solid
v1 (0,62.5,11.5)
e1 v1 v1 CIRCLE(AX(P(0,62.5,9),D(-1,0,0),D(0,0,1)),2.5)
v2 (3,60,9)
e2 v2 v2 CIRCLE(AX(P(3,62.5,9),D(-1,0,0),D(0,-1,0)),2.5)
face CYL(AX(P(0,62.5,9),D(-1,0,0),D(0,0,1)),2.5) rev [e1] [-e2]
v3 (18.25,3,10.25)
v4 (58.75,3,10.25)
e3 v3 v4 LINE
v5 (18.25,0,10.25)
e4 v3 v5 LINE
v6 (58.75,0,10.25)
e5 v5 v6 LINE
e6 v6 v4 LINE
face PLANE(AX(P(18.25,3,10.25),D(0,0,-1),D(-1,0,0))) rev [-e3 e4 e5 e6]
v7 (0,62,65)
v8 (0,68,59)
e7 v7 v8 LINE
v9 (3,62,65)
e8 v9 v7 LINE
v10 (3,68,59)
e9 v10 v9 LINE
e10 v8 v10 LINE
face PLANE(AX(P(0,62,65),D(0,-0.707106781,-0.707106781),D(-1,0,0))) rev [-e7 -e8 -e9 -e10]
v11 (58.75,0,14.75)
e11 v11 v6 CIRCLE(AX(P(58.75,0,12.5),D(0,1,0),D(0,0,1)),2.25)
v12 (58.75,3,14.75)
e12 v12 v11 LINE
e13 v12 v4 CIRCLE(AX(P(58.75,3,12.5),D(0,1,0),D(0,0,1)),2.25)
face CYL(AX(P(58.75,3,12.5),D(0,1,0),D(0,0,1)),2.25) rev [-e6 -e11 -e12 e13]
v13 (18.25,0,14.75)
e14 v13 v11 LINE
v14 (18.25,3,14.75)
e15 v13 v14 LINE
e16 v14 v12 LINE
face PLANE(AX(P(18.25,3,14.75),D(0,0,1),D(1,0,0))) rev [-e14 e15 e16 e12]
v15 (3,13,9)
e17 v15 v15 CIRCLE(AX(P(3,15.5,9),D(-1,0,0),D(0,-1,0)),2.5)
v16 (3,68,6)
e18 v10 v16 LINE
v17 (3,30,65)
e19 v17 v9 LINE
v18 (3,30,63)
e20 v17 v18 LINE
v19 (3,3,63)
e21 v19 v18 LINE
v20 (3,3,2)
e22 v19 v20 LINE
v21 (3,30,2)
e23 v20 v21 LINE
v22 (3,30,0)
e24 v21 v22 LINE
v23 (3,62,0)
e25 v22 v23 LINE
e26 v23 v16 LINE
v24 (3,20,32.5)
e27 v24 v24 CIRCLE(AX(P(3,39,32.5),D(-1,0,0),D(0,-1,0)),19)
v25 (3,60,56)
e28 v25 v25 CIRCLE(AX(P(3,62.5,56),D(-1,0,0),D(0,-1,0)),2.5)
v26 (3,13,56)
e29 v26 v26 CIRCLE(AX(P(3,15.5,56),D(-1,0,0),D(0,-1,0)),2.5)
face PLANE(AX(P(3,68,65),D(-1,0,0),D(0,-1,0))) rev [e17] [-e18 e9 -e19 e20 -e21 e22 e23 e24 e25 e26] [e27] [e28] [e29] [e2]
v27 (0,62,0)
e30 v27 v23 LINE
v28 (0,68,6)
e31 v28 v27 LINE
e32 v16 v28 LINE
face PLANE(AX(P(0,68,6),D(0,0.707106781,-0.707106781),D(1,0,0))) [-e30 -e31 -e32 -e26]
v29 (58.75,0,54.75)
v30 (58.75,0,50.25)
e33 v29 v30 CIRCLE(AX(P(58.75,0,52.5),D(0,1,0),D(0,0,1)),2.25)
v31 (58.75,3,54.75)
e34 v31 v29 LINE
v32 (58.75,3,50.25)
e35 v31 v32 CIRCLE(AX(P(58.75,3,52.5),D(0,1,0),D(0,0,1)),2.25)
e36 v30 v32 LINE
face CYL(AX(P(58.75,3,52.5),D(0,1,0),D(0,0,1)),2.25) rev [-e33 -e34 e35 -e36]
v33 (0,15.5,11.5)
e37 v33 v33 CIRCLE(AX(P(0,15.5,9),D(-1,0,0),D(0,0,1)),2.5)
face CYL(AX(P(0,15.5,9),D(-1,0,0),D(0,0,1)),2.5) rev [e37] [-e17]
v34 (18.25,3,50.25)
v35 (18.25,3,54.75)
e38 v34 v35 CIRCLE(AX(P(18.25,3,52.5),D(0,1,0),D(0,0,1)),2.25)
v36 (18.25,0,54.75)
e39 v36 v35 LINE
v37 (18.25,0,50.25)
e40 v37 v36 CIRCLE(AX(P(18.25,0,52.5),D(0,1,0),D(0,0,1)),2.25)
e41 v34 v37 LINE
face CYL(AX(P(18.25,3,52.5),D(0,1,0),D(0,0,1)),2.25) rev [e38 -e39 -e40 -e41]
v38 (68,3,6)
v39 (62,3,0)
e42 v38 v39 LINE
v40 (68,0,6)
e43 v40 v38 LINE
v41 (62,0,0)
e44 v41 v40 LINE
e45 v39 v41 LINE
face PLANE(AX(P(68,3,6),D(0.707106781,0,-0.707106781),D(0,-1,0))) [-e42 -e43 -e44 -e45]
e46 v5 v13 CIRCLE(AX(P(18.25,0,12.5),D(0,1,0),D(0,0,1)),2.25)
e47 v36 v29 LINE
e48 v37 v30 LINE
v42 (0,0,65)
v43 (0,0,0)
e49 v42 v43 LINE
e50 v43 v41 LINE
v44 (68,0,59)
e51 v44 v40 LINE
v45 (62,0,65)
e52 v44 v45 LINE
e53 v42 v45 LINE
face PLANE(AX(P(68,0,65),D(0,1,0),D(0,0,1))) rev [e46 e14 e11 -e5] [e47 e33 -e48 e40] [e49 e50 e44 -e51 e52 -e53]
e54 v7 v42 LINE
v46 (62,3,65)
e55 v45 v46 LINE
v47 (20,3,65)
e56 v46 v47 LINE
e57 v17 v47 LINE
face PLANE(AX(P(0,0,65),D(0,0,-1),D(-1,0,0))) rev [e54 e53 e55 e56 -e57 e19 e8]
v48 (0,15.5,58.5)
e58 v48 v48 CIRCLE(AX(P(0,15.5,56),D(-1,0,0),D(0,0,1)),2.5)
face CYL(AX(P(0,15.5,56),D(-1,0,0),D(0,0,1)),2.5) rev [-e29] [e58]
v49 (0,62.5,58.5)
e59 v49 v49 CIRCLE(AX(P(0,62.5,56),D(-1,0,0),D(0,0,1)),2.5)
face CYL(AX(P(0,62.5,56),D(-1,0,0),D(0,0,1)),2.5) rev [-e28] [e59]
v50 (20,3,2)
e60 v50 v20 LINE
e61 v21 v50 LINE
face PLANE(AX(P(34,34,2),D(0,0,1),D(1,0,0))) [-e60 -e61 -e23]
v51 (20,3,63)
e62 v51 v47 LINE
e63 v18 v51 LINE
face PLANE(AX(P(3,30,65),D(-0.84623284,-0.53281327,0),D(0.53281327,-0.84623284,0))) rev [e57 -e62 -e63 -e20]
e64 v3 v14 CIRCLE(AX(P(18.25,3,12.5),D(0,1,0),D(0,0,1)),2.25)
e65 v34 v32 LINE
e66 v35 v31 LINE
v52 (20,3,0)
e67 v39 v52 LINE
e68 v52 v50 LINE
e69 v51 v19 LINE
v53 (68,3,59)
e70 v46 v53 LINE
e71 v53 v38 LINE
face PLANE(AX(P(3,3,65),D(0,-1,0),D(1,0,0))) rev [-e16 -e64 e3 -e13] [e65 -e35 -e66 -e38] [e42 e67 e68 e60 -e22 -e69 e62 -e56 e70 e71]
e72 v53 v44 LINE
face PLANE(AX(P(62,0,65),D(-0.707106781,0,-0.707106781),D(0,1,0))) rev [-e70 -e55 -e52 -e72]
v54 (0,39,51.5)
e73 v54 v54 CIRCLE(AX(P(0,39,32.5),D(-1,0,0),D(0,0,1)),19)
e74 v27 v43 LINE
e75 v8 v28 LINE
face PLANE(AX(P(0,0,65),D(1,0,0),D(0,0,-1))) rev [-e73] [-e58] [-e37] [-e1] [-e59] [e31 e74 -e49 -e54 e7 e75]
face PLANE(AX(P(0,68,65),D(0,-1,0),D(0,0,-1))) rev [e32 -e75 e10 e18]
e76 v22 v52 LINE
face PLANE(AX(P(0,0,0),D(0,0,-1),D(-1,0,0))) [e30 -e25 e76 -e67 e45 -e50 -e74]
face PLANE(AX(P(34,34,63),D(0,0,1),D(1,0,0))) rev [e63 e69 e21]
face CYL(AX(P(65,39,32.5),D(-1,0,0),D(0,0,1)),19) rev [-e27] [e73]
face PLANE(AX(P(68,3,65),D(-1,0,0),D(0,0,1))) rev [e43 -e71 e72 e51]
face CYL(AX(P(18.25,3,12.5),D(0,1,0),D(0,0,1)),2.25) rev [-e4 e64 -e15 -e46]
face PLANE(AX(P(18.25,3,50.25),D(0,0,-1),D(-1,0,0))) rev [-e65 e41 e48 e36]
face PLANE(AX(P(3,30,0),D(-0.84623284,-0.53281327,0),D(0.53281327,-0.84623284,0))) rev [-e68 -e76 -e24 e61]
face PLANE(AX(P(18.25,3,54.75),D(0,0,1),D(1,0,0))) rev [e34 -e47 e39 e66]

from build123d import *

# Parameters (mm, degrees)
EXTRUDE_1_DEPTH             = 65
HOLE_WIZARD_4_5_4_5_1_DEPTH = 3
SKETCH_4_R                  = 19
CUT_EXTRUDE_1_DEPTH         = 65
HOLE_WIZARD_5_0_5_1_D       = 5
CHAMFER_1_SIZE              = 6
RIB_18_REACH                = 118.073
SKETCH_9_WALL_W             = 266.052617732
SKETCH_9_WALL_H             = 2
RIB_19_REACH                = 118.073
SKETCH_8_WALL_W             = 266.052617732
SKETCH_8_WALL_H             = 2


# Read off the part's stored shape, not the designer's step: Ø4.5 (4.5) 直径槽口1
with BuildPart() as part:
    # 草图1 → 凸台-拉伸1 (new body)
    with BuildSketch(Plane.XY):
        Polygon((0, 0), (0, 68), (3, 68), (3, 3), (68, 3), (68, 0), align=None)
    extrude(amount=EXTRUDE_1_DEPTH)

    # Ø4.5 (4.5) 直径槽口1 outline → Ø4.5 (4.5) 直径槽口1 (cut)
    with BuildSketch(Plane(origin=(0, 0, 0), x_dir=(1, 0, 0), z_dir=(0, 1, 0))):
        with BuildLine():
            Line((18.25, -14.75), (58.75, -14.75))
            ThreePointArc((58.75, -14.75), (61, -12.5), (58.75, -10.25))
            Line((58.75, -10.25), (18.25, -10.25))
            ThreePointArc((18.25, -10.25), (16, -12.5), (18.25, -14.75))
        make_face()
        with BuildLine():
            Line((18.25, -54.75), (58.75, -54.75))
            ThreePointArc((58.75, -54.75), (61, -52.5), (58.75, -50.25))
            Line((58.75, -50.25), (18.25, -50.25))
            ThreePointArc((18.25, -50.25), (16, -52.5), (18.25, -54.75))
        make_face()
    extrude(amount=HOLE_WIZARD_4_5_4_5_1_DEPTH, mode=Mode.SUBTRACT)

    # 草图4 → 切除-拉伸1 (cut)
    with BuildSketch(Plane.ZY):
        with Locations((32.5, 39)):
            Circle(SKETCH_4_R)
    extrude(amount=-CUT_EXTRUDE_1_DEPTH, mode=Mode.SUBTRACT)

    # Ø5.0 (5) 直径孔1 (through all)
    with Locations(Plane.ZY):
        with Locations((9, 62.5), (56, 62.5), (9, 15.5), (56, 15.5)):
            Hole(HOLE_WIZARD_5_0_5_1_D / 2)

    # 倒角1
    chamfer_1_edges = [part.edges().sort_by_distance(p)[0] for p in [
        (1.5, 68, 65),
        (1.5, 68, 0),
        (68, 1.5, 65),
        (68, 1.5, 0),
    ]]
    chamfer(chamfer_1_edges, length=CHAMFER_1_SIZE)

    # 草图9 wall → 筋18 (add, up to next)
    with BuildSketch(Plane(origin=(11.5, 16.5, 0), x_dir=(0.532813269686, -0.84623284009, 0), z_dir=(0.84623284009, 0.532813269686, 0)), mode=Mode.PRIVATE) as rib_18_sk1:
        with Locations((0, -1)):
            Rectangle(SKETCH_9_WALL_W, SKETCH_9_WALL_H)
    rib_18_tool1 = extrude(rib_18_sk1.sketch, amount=-RIB_18_REACH, mode=Mode.PRIVATE) - part.part
    add(rib_18_tool1.solids().sort_by_distance((11.5, 16.5, 0))[0])

    # 草图8 wall → 筋19 (add, up to next)
    with BuildSketch(Plane(origin=(11.5, 16.5, 65), x_dir=(0.532813269686, -0.84623284009, 0), z_dir=(0.84623284009, 0.532813269686, 0)), mode=Mode.PRIVATE) as rib_19_sk1:
        with Locations((0, 1)):
            Rectangle(SKETCH_8_WALL_W, SKETCH_8_WALL_H)
    rib_19_tool1 = extrude(rib_19_sk1.sketch, amount=-RIB_19_REACH, mode=Mode.PRIVATE) - part.part
    add(rib_19_tool1.solids().sort_by_distance((11.5, 16.5, 65))[0])


solid = part.part
